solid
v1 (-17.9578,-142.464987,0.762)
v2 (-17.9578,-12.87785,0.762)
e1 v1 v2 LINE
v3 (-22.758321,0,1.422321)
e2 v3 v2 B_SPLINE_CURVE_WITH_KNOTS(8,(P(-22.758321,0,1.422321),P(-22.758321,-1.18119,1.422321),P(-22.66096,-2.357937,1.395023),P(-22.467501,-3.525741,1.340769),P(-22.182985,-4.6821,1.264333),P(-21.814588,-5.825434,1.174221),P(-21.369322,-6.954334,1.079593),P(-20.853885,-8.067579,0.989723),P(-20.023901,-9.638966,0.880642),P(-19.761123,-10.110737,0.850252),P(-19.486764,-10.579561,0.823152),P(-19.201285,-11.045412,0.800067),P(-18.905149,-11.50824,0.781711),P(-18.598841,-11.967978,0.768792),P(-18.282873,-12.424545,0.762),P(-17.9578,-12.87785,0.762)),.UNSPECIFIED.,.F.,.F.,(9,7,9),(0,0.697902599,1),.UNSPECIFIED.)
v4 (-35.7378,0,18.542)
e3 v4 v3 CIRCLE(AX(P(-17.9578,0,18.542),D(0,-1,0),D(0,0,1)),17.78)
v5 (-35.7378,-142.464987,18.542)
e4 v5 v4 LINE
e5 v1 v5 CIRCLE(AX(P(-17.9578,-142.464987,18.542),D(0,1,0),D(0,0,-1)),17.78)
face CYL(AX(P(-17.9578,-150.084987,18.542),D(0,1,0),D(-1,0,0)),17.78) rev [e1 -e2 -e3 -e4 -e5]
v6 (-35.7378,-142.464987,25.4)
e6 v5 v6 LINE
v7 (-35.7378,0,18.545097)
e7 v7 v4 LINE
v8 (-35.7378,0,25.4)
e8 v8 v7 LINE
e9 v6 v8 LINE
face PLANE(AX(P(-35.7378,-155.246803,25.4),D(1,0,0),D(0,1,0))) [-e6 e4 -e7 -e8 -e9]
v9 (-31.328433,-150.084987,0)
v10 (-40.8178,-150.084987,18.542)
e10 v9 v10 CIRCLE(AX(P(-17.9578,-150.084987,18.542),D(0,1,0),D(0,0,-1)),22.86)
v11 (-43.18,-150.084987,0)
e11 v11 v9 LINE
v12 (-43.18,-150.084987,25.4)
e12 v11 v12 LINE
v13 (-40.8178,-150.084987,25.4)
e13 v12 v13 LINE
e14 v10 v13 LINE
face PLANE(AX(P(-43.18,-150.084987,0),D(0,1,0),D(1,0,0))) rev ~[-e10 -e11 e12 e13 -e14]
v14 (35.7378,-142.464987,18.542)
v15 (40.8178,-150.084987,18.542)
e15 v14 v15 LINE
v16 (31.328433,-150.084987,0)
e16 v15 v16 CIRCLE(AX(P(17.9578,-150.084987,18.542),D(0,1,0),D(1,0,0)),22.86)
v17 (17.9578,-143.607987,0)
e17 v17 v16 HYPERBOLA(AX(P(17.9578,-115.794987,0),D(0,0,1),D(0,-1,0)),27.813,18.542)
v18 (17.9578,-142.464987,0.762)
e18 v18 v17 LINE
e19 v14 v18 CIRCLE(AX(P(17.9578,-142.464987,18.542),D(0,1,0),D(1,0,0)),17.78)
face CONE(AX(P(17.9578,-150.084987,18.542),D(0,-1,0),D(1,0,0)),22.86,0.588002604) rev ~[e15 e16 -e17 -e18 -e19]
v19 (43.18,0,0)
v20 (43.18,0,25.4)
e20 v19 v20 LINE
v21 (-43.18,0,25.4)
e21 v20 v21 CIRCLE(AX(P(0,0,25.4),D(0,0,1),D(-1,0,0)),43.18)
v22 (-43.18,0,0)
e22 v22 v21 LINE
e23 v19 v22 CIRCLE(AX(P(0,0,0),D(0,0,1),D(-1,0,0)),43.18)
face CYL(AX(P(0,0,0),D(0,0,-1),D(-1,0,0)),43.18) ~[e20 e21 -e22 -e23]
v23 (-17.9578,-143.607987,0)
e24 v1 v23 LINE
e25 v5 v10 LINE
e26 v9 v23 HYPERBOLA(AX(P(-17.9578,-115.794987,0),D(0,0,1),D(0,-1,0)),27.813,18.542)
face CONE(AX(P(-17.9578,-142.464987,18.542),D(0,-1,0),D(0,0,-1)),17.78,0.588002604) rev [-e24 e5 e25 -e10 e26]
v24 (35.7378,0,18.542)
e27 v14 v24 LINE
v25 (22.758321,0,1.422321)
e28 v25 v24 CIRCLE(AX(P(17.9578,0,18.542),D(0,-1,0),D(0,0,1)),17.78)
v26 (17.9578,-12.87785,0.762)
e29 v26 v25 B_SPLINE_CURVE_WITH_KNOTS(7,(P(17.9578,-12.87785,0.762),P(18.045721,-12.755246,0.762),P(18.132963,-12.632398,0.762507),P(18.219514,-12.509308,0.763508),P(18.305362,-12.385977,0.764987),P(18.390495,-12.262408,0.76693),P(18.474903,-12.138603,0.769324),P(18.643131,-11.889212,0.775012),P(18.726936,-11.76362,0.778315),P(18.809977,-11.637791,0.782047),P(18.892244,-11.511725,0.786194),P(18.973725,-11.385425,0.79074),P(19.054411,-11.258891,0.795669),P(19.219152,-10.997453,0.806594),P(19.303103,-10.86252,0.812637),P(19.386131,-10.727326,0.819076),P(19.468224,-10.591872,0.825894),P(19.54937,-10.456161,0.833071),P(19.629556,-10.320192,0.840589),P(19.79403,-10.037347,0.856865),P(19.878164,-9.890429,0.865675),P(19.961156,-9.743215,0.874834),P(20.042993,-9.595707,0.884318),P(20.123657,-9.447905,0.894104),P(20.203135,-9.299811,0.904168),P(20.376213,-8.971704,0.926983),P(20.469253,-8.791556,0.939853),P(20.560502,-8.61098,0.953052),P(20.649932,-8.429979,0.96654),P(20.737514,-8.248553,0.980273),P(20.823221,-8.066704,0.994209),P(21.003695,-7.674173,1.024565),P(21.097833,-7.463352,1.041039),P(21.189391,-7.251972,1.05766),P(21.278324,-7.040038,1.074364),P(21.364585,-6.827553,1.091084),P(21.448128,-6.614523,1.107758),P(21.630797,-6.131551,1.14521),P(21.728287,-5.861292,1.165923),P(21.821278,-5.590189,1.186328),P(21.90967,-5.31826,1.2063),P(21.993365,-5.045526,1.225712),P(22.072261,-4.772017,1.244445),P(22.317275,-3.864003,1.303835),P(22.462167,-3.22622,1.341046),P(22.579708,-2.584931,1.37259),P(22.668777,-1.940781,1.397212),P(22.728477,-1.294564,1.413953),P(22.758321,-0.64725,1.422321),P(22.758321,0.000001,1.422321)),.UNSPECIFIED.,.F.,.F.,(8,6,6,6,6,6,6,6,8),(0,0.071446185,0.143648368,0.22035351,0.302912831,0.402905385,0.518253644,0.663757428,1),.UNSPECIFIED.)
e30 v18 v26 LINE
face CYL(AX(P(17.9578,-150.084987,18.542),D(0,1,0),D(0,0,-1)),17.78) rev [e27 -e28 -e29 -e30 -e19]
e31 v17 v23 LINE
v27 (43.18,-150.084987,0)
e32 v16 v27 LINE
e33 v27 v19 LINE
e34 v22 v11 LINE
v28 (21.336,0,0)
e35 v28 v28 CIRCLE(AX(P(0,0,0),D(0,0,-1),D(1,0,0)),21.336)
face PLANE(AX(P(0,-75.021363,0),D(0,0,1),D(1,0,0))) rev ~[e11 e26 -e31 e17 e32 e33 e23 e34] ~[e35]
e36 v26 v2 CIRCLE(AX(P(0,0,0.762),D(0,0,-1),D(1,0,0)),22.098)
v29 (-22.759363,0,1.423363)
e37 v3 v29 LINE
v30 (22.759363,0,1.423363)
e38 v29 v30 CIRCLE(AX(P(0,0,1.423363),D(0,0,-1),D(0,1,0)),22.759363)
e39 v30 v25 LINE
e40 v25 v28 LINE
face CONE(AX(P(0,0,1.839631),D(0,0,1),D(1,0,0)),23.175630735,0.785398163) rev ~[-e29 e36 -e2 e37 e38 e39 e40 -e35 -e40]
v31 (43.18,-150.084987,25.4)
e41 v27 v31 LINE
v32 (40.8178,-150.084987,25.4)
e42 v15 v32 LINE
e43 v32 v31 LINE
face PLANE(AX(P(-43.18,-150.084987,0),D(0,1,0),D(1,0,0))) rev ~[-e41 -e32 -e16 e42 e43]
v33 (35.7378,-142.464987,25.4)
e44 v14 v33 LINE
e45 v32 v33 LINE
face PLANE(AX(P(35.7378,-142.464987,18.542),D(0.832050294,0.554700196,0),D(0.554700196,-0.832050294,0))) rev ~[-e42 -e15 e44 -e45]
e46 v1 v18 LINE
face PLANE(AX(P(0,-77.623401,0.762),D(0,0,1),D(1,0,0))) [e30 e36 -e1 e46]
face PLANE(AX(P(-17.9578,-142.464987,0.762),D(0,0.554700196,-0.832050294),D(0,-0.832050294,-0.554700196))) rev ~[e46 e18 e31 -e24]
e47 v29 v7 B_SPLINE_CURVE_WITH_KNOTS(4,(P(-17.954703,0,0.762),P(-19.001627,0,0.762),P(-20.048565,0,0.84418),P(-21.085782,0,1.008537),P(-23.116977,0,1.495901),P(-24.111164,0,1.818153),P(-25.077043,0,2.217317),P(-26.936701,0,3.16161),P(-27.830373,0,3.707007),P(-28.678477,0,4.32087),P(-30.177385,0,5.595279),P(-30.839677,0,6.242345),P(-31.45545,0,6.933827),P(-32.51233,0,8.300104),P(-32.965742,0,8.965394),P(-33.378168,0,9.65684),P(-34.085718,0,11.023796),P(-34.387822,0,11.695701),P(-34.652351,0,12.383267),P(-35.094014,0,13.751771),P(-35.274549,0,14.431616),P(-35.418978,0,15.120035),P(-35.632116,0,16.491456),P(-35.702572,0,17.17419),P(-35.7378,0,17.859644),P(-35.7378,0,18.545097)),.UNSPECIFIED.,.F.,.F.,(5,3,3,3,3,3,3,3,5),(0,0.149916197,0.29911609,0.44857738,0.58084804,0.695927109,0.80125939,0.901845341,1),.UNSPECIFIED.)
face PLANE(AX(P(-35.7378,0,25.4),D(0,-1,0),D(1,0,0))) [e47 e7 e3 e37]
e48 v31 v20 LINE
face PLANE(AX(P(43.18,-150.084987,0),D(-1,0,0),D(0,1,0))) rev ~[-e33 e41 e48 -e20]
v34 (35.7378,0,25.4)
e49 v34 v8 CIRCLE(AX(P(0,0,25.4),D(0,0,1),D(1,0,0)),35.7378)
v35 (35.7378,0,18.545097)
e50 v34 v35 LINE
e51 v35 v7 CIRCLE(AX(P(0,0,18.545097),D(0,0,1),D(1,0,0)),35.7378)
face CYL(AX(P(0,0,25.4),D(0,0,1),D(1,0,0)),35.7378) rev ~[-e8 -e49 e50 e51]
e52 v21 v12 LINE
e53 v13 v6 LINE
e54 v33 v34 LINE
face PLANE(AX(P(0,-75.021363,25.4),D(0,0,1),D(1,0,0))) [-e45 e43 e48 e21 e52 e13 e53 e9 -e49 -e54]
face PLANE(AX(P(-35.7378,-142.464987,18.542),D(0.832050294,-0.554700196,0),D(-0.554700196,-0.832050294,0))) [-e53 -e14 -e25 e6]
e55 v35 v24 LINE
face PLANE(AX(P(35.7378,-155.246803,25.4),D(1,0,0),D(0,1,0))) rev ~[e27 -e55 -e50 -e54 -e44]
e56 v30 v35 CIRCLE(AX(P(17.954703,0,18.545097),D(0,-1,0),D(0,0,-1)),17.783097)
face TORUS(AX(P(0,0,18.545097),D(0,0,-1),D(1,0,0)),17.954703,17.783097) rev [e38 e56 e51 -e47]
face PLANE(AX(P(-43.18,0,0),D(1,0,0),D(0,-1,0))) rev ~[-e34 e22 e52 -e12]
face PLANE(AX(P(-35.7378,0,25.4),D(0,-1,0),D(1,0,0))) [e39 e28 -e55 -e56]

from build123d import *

# Parameters (mm, degrees)
F1_DEPTH     = 25.4
F2_R         = 17.018
F3_DEPTH     = 27.686
F4_R         = 35.7378
F5_DEPTH     = 24.638
F6_R         = 17.7830971004
F7_DEPTH     = 25.4
F8_W         = 71.4756
F8_H         = 155.2468025039
F9_DEPTH     = 24.638
F10_R        = 17.78
F12_T1_DEPTH = 35.9156
F12_T3_DEPTH = 26.5465599919
F12_T6_ANGLE = 90
F12_T8_ANGLE = 90


# Not quite as in the source:
# - a fillet or chamfer that OpenCascade refuses, or shapes differently, is made with other operations: its cross-section is extruded or revolved along the edge and cut away or added


with BuildPart() as f1:
    # F0 (on Top) → F1 (new body)
    with BuildSketch(Plane.XY):
        with BuildLine():
            Line((-43.18, 0), (43.18, 0))
            ThreePointArc((43.18, 0), (0, 43.18), (-43.18, 0))
        make_face()
        with BuildLine():
            ThreePointArc((-43.18, 0), (0, -43.18), (43.18, 0))
            Line((43.18, 0), (-43.18, 0))
        make_face()
    extrude(amount=F1_DEPTH)

    # F2 (on face) → F3 (cut)
    with BuildSketch(Plane.XY):
        Circle(F2_R)
    extrude(amount=F3_DEPTH, mode=Mode.SUBTRACT)

    # F4 (on face) → F5 (cut)
    with BuildSketch(Plane.XY.offset(25.4)):
        Circle(F4_R)
    extrude(amount=-F5_DEPTH, mode=Mode.SUBTRACT)

    # F6
    f6_edges = [f1.edges().sort_by_distance(p)[0] for p in [
        (-35.7378, 0, 0.762),
    ]]
    fillet(f6_edges, radius=F6_R)

    # F0 (on Top) → F7 (join)
    with BuildSketch(Plane.XY):
        with BuildLine():
            Line((43.18, -150.0849872828), (43.18, 0))
            ThreePointArc((43.18, 0), (0, -43.18), (-43.18, 0))
            Line((-43.18, 0), (-43.18, -150.0849872828))
            Line((-43.18, -150.0849872828), (43.18, -150.0849872828))
        make_face()
    extrude(amount=F7_DEPTH)

    # F8 (on face) → F9 (cut)
    with BuildSketch(Plane.XY.offset(25.4)):
        with Locations((0, -77.6234012519)):
            Rectangle(F8_W, F8_H)
    extrude(amount=-F9_DEPTH, mode=Mode.SUBTRACT)

    # F10
    f10_edges = [f1.edges().sort_by_distance(p)[0] for p in [
        (35.7378, -75.042494, 0.762),
        (-35.7378, -75.042494, 0.762),
    ]]
    fillet(f10_edges, radius=F10_R)

    # F11: chamfer of 5.08 on 1 edges, made by hand


with BuildPart() as f11_tool2:
    # F11_s3 → F11_t4 (revolve)
    with BuildSketch(Plane.XZ):
        with BuildLine():
            Line((23.1756307345, 1.8396307345), (15.9403692655, -5.3956307345))
            Line((15.9403692655, -5.3956307345), (15.1783692655, -5.3956307345))
            ThreePointArc((15.1783692655, -5.3956307345), (16.256, -2.3168153673), (16.256, 0.762))
            Line((16.256, 0.762), (17.018, 1.524))
            ThreePointArc((17.018, 1.524), (20.0968153673, 1.524), (23.1756307345, 2.6016307345))
            Line((23.1756307345, 2.6016307345), (23.1756307345, 1.8396307345))
        make_face()
    revolve(axis=Axis((0, 0, 0.762), (0, 0, -1)))

    split(bisect_by=Plane.XZ, keep=Keep.TOP)


with BuildPart() as f1_1:
    add(f1.part)

    # F11_t1: cut F11_tool2
    add(f11_tool2.part, mode=Mode.SUBTRACT)


with BuildPart() as f11_tool7:
    # F11_s8 → F11_t9 (revolve)
    with BuildSketch(Plane.XZ):
        with BuildLine():
            Line((23.1756307345, 1.8396307345), (15.9403692655, -5.3956307345))
            Line((15.9403692655, -5.3956307345), (15.1783692655, -5.3956307345))
            ThreePointArc((15.1783692655, -5.3956307345), (16.256, -2.3168153673), (16.256, 0.762))
            Line((16.256, 0.762), (17.018, 1.524))
            ThreePointArc((17.018, 1.524), (20.0968153673, 1.524), (23.1756307345, 2.6016307345))
            Line((23.1756307345, 2.6016307345), (23.1756307345, 1.8396307345))
        make_face()
    revolve(axis=Axis((0, 0, 0.762), (0, 0, -1)))

    split(bisect_by=Plane.XZ, keep=Keep.BOTTOM)


with BuildPart() as f1_2:
    add(f1_1.part)

    # F11_t6: cut F11_tool7
    add(f11_tool7.part, mode=Mode.SUBTRACT)

    # F12: chamfer of 5.08 x 7.62 on 5 edges, made by hand

    # F12_s2 → F12_t1 (cut)
    with BuildSketch(Plane.YZ.offset(-17.9578)):
        Polygon((-142.4649872828, 0.762), (-150.0849872828, -4.318), (-150.0849872828, 0.762), align=None)
    extrude(amount=F12_T1_DEPTH, mode=Mode.SUBTRACT)

    # F12_s4 → F12_t3 (cut)
    with BuildSketch(Plane.XY.offset(18.542)):
        Polygon((35.7378, -142.4649872828), (40.8178, -150.0849872828), (35.7378, -150.0849872828), align=None)
        Polygon((-35.7378, -142.4649872828), (-40.8178, -150.0849872828), (-35.7378, -150.0849872828), align=None)
    extrude(amount=F12_T3_DEPTH, mode=Mode.SUBTRACT)

    # F12_s5 → F12_t6 (revolve, cut)
    with BuildSketch(Plane.YZ.offset(-17.9578)):
        Polygon((-142.4649872828, 0.762), (-150.0849872828, -4.318), (-150.0849872828, 0.762), align=None)
    revolve(axis=Axis((-17.9578, -150.0849872828, 18.542), (0, 1, 0)), revolution_arc=F12_T6_ANGLE, mode=Mode.SUBTRACT)

    # F12_s7 → F12_t8 (revolve, cut)
    with BuildSketch(Plane.XY.offset(18.542)):
        Polygon((40.8178, -150.0849872828), (35.7378, -142.4649872828), (35.7378, -150.0849872828), align=None)
    revolve(axis=Axis((17.9578, -150.0849872828, 18.542), (0, 1, 0)), revolution_arc=F12_T8_ANGLE, mode=Mode.SUBTRACT)


solid = f1_2.part
